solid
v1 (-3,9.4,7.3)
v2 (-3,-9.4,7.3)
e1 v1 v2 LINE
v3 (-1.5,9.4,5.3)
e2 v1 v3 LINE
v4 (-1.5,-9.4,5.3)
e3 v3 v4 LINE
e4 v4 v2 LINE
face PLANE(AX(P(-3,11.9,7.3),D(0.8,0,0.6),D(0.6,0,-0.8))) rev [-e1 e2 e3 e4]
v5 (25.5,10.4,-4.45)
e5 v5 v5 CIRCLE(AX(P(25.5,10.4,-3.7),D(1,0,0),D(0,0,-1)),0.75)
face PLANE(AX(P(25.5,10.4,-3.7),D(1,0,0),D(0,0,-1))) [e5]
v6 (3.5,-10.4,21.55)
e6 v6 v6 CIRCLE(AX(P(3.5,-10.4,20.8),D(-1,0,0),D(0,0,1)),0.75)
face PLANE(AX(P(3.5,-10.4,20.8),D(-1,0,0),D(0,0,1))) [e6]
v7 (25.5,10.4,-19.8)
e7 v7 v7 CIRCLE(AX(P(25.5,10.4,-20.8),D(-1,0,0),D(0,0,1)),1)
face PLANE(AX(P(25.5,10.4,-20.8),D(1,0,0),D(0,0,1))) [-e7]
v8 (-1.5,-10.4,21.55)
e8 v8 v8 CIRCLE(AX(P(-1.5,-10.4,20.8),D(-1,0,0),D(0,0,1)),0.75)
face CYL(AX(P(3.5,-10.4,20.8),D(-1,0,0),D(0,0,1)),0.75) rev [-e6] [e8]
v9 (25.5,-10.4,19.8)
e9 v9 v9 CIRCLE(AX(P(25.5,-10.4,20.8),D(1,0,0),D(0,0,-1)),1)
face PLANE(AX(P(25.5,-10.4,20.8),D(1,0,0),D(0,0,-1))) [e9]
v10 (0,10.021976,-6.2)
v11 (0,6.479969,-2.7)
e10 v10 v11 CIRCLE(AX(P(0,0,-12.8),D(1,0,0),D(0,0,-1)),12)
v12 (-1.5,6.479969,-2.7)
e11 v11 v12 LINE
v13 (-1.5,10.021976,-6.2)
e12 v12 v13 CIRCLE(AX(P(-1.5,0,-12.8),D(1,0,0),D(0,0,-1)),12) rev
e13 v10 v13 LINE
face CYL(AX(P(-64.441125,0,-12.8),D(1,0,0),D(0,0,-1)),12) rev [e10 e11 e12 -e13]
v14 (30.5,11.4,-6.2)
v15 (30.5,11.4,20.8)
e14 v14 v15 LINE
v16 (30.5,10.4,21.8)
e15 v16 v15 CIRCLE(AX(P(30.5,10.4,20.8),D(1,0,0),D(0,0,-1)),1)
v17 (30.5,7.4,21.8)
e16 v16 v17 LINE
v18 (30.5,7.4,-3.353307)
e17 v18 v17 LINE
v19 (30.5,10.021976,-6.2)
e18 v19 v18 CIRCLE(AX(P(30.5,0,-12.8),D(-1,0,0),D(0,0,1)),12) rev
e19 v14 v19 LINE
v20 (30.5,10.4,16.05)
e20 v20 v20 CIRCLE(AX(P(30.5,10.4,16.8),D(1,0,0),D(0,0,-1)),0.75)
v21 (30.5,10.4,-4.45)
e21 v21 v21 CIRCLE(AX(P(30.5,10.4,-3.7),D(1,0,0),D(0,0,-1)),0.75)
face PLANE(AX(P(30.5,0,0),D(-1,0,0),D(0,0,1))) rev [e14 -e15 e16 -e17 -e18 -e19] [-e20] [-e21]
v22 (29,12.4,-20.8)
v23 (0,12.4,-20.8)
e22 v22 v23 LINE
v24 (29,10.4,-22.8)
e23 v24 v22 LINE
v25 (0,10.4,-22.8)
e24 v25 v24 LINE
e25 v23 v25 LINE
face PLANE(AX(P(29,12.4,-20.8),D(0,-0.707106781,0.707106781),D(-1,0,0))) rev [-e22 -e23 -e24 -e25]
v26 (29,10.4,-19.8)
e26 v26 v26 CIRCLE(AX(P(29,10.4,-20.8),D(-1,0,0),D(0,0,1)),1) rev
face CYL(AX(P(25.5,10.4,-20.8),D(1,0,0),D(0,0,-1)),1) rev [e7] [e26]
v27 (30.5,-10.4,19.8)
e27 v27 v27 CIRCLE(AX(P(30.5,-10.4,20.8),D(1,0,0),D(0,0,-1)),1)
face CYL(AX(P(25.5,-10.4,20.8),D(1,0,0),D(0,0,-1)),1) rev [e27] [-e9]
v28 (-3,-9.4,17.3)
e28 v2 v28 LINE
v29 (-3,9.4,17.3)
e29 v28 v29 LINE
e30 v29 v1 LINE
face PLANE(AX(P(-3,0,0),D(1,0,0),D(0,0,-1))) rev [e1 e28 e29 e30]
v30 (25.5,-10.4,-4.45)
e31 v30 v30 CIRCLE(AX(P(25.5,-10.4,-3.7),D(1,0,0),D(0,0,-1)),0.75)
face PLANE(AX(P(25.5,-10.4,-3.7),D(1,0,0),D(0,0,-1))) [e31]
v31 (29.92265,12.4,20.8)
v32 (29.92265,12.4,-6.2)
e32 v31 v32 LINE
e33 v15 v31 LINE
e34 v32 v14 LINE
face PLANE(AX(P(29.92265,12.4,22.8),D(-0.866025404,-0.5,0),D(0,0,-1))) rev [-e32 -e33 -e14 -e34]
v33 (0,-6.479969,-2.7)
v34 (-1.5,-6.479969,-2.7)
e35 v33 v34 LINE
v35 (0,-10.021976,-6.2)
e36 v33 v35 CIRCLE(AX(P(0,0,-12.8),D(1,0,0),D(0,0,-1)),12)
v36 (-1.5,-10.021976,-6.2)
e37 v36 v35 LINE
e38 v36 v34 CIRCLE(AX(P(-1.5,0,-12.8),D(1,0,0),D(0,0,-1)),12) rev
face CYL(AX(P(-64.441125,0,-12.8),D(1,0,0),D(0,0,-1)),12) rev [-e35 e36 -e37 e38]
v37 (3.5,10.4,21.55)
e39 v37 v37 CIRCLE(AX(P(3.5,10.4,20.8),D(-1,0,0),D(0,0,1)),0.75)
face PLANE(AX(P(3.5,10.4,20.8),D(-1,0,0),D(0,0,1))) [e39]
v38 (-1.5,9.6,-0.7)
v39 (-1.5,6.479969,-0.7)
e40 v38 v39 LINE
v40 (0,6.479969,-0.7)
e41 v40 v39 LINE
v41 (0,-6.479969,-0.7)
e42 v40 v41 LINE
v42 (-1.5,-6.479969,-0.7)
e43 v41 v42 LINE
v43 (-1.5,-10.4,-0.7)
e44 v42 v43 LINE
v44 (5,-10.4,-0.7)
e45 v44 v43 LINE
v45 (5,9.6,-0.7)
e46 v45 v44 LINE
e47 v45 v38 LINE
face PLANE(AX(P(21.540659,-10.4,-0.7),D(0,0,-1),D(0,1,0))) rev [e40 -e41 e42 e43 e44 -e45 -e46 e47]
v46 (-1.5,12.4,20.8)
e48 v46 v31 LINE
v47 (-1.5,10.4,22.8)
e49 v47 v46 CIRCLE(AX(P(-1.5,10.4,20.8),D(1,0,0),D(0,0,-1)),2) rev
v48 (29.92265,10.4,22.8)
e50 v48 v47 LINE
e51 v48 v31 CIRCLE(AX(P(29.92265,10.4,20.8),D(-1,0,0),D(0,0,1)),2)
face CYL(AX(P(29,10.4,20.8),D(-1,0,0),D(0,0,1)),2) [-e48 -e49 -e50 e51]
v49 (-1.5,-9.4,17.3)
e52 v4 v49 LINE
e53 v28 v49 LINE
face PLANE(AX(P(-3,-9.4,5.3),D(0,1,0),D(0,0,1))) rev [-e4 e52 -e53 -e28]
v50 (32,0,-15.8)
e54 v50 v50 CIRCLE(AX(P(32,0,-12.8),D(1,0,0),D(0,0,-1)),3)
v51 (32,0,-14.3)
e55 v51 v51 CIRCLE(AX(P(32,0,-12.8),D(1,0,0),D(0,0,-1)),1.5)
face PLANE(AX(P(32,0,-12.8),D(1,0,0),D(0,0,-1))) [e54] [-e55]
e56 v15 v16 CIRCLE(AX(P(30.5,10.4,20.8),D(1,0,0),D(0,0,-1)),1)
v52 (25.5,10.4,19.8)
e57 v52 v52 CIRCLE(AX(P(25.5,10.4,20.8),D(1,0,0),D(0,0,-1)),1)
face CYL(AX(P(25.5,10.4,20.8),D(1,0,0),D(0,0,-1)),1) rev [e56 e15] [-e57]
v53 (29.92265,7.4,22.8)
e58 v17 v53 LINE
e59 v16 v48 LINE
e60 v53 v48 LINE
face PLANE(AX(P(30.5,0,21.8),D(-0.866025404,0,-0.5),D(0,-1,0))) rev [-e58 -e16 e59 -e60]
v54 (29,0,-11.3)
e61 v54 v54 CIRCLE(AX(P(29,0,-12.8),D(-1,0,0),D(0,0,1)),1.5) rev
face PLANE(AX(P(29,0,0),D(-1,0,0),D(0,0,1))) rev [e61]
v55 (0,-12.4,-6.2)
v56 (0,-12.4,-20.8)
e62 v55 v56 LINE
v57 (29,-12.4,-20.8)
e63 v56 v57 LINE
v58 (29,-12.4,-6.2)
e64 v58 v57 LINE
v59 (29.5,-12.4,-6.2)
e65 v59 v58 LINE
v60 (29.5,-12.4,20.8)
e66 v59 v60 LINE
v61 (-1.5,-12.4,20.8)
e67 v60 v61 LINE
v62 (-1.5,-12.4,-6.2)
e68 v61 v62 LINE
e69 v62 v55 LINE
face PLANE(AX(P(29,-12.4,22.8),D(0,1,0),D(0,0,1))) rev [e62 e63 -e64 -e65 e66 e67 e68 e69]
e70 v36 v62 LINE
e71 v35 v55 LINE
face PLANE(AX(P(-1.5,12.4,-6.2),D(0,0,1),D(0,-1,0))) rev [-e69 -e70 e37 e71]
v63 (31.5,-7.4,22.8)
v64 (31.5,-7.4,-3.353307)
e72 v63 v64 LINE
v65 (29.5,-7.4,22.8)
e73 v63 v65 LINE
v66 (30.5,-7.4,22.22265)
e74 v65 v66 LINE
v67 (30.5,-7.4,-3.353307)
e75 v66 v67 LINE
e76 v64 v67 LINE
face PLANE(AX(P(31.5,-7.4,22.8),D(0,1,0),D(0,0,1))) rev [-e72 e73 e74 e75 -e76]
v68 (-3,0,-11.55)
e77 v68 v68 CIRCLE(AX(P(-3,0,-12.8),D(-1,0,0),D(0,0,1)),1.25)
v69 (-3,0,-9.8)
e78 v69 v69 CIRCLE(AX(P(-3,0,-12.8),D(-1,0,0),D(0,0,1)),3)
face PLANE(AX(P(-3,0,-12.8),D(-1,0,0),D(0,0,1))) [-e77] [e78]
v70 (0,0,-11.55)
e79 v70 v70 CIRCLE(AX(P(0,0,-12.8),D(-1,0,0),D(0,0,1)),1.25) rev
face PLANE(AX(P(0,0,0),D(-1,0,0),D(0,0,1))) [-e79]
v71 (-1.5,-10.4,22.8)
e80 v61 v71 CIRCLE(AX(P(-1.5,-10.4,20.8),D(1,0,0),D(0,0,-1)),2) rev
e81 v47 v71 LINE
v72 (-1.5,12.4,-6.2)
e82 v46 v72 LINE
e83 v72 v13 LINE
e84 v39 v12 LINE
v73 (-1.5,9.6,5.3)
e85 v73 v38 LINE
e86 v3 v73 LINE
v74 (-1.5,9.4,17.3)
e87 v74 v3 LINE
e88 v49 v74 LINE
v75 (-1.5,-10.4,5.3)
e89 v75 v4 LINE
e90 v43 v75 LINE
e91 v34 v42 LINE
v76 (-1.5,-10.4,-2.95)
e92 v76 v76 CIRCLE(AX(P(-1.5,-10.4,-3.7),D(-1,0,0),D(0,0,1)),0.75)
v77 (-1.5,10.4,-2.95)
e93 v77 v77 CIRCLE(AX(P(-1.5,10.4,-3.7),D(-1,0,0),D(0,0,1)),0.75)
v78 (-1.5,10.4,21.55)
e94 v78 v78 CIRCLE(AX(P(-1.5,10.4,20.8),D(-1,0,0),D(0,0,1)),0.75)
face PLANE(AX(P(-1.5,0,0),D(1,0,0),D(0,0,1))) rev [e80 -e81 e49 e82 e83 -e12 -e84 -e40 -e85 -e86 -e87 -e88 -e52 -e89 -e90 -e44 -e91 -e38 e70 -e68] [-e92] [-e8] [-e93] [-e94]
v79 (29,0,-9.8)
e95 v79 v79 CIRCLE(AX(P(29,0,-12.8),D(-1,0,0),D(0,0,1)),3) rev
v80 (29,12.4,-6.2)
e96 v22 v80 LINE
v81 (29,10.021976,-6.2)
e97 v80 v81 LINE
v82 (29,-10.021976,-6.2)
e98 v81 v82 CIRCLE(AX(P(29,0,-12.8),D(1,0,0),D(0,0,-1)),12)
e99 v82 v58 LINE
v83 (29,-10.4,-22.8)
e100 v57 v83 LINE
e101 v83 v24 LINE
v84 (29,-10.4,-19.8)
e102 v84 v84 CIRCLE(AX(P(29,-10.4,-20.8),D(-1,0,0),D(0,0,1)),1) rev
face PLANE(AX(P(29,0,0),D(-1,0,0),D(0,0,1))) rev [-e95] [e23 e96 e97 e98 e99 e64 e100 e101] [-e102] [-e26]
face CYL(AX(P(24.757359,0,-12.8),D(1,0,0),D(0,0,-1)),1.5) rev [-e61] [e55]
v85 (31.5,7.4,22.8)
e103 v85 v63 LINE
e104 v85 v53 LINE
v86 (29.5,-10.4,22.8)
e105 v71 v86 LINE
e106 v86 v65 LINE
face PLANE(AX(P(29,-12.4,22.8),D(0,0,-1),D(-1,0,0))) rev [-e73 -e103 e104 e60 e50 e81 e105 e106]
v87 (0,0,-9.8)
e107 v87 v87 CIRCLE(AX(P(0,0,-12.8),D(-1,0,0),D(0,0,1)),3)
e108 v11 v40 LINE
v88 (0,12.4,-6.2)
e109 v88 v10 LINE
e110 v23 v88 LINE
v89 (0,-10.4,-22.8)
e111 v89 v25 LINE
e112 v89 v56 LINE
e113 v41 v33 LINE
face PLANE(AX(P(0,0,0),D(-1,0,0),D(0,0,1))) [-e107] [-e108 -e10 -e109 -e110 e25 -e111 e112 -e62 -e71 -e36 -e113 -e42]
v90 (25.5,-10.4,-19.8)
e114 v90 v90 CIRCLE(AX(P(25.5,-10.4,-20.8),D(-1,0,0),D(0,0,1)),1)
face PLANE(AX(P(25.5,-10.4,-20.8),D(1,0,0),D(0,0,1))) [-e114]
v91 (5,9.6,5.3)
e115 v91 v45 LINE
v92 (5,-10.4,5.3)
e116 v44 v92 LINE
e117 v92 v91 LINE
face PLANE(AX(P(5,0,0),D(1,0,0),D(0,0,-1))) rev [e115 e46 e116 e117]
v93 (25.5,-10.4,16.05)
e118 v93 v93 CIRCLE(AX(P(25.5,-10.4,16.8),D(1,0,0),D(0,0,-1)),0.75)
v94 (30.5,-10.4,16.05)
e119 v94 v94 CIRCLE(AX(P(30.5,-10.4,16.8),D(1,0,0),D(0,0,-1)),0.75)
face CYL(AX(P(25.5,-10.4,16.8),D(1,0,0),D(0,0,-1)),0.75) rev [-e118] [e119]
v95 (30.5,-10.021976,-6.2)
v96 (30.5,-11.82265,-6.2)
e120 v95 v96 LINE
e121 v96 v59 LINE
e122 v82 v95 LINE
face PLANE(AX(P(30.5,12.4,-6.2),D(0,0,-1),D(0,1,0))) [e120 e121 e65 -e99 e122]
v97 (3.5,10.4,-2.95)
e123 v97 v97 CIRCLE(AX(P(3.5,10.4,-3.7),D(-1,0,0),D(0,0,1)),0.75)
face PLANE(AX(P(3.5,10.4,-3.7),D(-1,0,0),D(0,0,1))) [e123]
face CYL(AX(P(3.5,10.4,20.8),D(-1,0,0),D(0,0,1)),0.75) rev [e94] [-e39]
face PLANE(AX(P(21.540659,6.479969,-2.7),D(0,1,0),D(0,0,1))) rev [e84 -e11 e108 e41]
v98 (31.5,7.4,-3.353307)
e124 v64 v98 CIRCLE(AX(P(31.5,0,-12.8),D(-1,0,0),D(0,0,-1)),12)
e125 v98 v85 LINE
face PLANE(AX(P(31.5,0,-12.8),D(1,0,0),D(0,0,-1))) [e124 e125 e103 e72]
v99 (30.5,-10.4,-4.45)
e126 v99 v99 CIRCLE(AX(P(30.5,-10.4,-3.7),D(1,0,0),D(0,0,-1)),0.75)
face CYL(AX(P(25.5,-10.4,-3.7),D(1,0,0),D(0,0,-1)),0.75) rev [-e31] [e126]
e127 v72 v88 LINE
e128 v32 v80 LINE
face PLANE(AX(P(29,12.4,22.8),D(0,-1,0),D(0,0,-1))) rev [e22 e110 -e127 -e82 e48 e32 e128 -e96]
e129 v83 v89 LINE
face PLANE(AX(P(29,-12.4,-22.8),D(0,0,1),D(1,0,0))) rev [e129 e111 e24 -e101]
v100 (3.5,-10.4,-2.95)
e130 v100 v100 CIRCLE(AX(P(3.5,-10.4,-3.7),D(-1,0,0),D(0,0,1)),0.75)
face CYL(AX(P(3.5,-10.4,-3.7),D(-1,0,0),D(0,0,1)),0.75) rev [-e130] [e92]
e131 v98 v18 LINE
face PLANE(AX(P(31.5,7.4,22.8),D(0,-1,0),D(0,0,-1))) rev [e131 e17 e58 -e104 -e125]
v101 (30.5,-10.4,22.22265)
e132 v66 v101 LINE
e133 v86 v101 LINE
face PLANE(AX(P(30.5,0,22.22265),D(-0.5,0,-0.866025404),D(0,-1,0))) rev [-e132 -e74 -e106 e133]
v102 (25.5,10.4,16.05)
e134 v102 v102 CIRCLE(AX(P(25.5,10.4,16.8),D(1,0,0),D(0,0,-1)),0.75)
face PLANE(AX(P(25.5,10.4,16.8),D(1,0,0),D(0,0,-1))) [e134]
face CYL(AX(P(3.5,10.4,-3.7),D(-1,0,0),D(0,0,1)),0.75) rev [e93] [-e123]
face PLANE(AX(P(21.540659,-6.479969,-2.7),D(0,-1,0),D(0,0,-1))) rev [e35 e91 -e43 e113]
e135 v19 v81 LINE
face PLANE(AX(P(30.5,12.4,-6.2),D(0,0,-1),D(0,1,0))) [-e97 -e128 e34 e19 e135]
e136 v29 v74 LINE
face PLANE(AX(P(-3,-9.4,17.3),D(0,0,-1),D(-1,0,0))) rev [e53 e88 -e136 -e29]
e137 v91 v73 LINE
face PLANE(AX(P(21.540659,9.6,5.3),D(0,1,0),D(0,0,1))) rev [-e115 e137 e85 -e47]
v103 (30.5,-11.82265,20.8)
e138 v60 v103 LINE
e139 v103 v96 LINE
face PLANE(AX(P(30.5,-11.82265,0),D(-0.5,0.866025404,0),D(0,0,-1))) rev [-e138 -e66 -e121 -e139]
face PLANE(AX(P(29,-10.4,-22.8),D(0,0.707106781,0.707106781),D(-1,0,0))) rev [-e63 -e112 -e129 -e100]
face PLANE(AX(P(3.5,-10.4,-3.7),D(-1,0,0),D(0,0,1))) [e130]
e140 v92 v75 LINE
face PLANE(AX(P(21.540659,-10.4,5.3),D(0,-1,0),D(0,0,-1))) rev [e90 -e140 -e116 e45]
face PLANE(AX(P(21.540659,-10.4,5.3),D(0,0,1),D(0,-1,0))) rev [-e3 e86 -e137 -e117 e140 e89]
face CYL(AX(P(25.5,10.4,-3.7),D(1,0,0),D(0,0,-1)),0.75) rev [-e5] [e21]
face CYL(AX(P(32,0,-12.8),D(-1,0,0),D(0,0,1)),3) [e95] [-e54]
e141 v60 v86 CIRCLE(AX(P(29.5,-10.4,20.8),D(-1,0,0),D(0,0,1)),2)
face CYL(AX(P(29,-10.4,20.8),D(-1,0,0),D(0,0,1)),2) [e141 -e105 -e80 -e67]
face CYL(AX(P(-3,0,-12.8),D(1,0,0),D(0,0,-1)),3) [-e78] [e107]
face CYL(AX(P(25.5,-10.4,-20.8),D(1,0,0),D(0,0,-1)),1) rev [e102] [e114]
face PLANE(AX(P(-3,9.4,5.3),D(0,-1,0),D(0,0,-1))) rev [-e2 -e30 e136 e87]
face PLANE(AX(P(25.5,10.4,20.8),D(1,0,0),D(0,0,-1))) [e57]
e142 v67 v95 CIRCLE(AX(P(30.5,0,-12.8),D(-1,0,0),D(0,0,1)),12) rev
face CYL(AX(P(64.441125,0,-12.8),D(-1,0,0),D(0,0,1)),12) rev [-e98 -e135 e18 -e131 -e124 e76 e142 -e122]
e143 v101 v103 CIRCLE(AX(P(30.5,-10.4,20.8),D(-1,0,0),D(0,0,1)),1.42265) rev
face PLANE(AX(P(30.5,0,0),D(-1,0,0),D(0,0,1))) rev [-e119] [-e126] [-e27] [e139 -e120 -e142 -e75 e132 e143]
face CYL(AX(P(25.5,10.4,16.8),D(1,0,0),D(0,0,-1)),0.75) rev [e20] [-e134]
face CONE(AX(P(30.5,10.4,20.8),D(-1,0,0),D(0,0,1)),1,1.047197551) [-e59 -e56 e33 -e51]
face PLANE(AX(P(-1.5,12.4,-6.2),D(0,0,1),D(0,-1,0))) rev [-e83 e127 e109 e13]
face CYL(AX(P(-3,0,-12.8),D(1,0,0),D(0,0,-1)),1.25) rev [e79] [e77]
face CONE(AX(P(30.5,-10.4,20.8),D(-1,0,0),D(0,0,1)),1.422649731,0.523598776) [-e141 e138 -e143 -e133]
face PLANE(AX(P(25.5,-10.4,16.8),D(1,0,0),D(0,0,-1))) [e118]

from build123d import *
from OCP.BRepFilletAPI import BRepFilletAPI_MakeChamfer

# Parameters (mm, degrees)
SKETCH3_W           = 45.6
SKETCH3_H           = 24.8
BOSS_EXTRUDE1_DEPTH = 29
SKETCH4_W           = 29
SKETCH4_H           = 24.8
BOSS_EXTRUDE2_DEPTH = 1.5
SKETCH6_R           = 12
CUT_EXTRUDE1_DEPTH  = 1.5
BOSS_EXTRUDE3_DEPTH = 1
SKETCH10_W          = 12
SKETCH10_H          = 18.8
BOSS_EXTRUDE5_DEPTH = 1.5
CUT_EXTRUDE2_DEPTH  = 18.8
CUT_EXTRUDE3_DEPTH  = 1.5
SKETCH13_W          = 6
SKETCH13_H          = 20
CUT_EXTRUDE4_DEPTH  = 5
SKETCH14_R          = 0.75
CUT_EXTRUDE5_DEPTH  = 5
SKETCH8_R           = 1
CUT_EXTRUDE6_DEPTH  = 5
CUT_EXTRUDE7_START  = -5
SKETCH15_R          = 0.75
CUT_EXTRUDE7_DEPTH  = 5
SKETCH17_R          = 0.75
CUT_EXTRUDE8_DEPTH  = 5
SKETCH18_R          = 3
BOSS_EXTRUDE6_DEPTH = 3
SKETCH19_R          = 1.5
CUT_EXTRUDE9_DEPTH  = 3
FILLET1_R           = 2
CHAMFER1_SIZE       = 2
CHAMFER2_SIZE       = 1
CHAMFER2_SIZE_2     = 0.577350269
BOSS_EXTRUDE7_START = 3
SKETCH9_R           = 3
SKETCH9_R_2         = 1.25
BOSS_EXTRUDE7_DEPTH = 3


with BuildPart() as part:
    # Sketch3 → Boss-Extrude1 (new body)
    with BuildSketch(Plane(origin=(0, 0, 0), x_dir=(0, 0, -1), z_dir=(1, 0, 0))):
        Rectangle(SKETCH3_W, SKETCH3_H)
    extrude(amount=BOSS_EXTRUDE1_DEPTH)

    # Sketch4 → Boss-Extrude2 (add)
    with BuildSketch(Plane(origin=(29, 0, 0), x_dir=(0, 0, -1), z_dir=(1, 0, 0))):
        with Locations((-8.3, 0)):
            Rectangle(SKETCH4_W, SKETCH4_H)
    boss_extrude2 = extrude(amount=BOSS_EXTRUDE2_DEPTH)

    # Sketch6 → Cut-Extrude1 (cut)
    with BuildSketch(Plane(origin=(29, 0, 0), x_dir=(0, 0, -1), z_dir=(1, 0, 0))):
        with Locations((12.8, 0)):
            Circle(SKETCH6_R)
    cut_extrude1 = extrude(amount=CUT_EXTRUDE1_DEPTH, mode=Mode.SUBTRACT)

    # Sketch7 → Boss-Extrude3 (add)
    with BuildSketch(Plane(origin=(30.5, 0, 0), x_dir=(0, 0, -1), z_dir=(1, 0, 0))):
        with BuildLine():
            Line((-22.8, 7.4), (3.353307457, 7.4))
            ThreePointArc((3.353307457, 7.4), (0.8, 0), (3.353307457, -7.4))
            Line((3.353307457, -7.4), (-22.8, -7.4))
            Line((-22.8, -7.4), (-22.8, 7.4))
        make_face()
    extrude(amount=BOSS_EXTRUDE3_DEPTH)

    # Mirror2: Boss-Extrude2, Cut-Extrude1 across plane
    add(boss_extrude2.mirror(Plane.ZY.offset(-14.5)))
    add(cut_extrude1.mirror(Plane.ZY.offset(-14.5)), mode=Mode.SUBTRACT)

    # Sketch10 → Boss-Extrude5 (add)
    with BuildSketch(Plane.ZY.offset(1.5)):
        with Locations((11.3, 0)):
            Rectangle(SKETCH10_W, SKETCH10_H)
    extrude(amount=BOSS_EXTRUDE5_DEPTH)

    # Sketch11 → Cut-Extrude2 (cut)
    with BuildSketch(Plane.XZ.offset(9.4)):
        Polygon((-3, 7.3), (-1.5, 5.3), (-3, 5.3), align=None)
    extrude(amount=-CUT_EXTRUDE2_DEPTH, mode=Mode.SUBTRACT)

    # Sketch12 → Cut-Extrude3 (cut)
    with BuildSketch(Plane.ZY.offset(1.5)):
        with BuildLine():
            Line((5.3, -10.4), (-0.7, -10.4))
            Line((-0.7, -10.4), (-0.7, -6.479969136))
            Line((-0.7, -6.479969136), (-2.7, -6.479969136))
            ThreePointArc((-2.7, -6.479969136), (-0.8, 0), (-2.7, 6.479969136))
            Line((-2.7, 6.479969136), (-0.7, 6.479969136))
            Line((-0.7, 6.479969136), (-0.7, 9.6))
            Line((-0.7, 9.6), (5.3, 9.6))
            Line((5.3, 9.6), (5.3, -10.4))
        make_face()
    extrude(amount=-CUT_EXTRUDE3_DEPTH, mode=Mode.SUBTRACT)

    # Sketch13 → Cut-Extrude4 (cut)
    with BuildSketch(Plane.ZY):
        with Locations((2.3, -0.4)):
            Rectangle(SKETCH13_W, SKETCH13_H)
    extrude(amount=-CUT_EXTRUDE4_DEPTH, mode=Mode.SUBTRACT)

    # Sketch14 → Cut-Extrude5 (cut)
    with BuildSketch(Plane.ZY.offset(1.5)):
        with Locations((20.8, 10.4)):
            Circle(SKETCH14_R)
        with Locations((20.8, -10.4)):
            Circle(SKETCH14_R)
        with Locations((-3.7, 10.4)):
            Circle(SKETCH14_R)
        with Locations((-3.7, -10.4)):
            Circle(SKETCH14_R)
    extrude(amount=-CUT_EXTRUDE5_DEPTH, mode=Mode.SUBTRACT)

    # Sketch8 → Cut-Extrude6 (cut)
    with BuildSketch(Plane(origin=(30.5, 0, 0), x_dir=(0, 0, -1), z_dir=(1, 0, 0))):
        with Locations((-20.8, 10.4)):
            Circle(SKETCH8_R)
        with Locations((-20.8, -10.4)):
            Circle(SKETCH8_R)
    cut_extrude6 = extrude(amount=-CUT_EXTRUDE6_DEPTH, mode=Mode.SUBTRACT)

    # Sketch15 → Cut-Extrude7 (cut)
    with BuildSketch(Plane(origin=(30.5, 0, 0), x_dir=(0, 0, -1), z_dir=(1, 0, 0)).offset(CUT_EXTRUDE7_START)):
        with Locations(Location((3.7, -10.4, 0), (0, 0, 180))):
            Circle(SKETCH15_R)
        with Locations(Location((3.7, 10.4, 0), (0, 0, 180))):
            Circle(SKETCH15_R)
    extrude(amount=CUT_EXTRUDE7_DEPTH, mode=Mode.SUBTRACT)

    # Sketch17 → Cut-Extrude8 (cut)
    with BuildSketch(Plane(origin=(30.5, 0, 0), x_dir=(0, 0, -1), z_dir=(1, 0, 0))):
        with Locations((-16.8, 10.4)):
            Circle(SKETCH17_R)
        with Locations((-16.8, -10.4)):
            Circle(SKETCH17_R)
    extrude(amount=-CUT_EXTRUDE8_DEPTH, mode=Mode.SUBTRACT)

    # Mirror3: Cut-Extrude6 across plane
    add(cut_extrude6.mirror(Plane.XY), mode=Mode.SUBTRACT)

    # Sketch18 → Boss-Extrude6 (add)
    with BuildSketch(Plane(origin=(29, 0, 0), x_dir=(0, 0, -1), z_dir=(1, 0, 0))):
        with Locations(Location((12.8, 0, 0), (0, 0, 180))):
            Circle(SKETCH18_R)
    extrude(amount=BOSS_EXTRUDE6_DEPTH)

    # Sketch19 → Cut-Extrude9 (cut)
    with BuildSketch(Plane(origin=(32, 0, 0), x_dir=(0, 0, -1), z_dir=(1, 0, 0))):
        with Locations((12.8, 0)):
            Circle(SKETCH19_R)
    extrude(amount=-CUT_EXTRUDE9_DEPTH, mode=Mode.SUBTRACT)

    # Fillet1
    fillet1_edges = [part.edges().sort_by_distance(p)[0] for p in [
        (14.5, -12.4, 22.8),
        (14.5, 12.4, 22.8),
    ]]
    fillet(fillet1_edges, radius=FILLET1_R)

    # Chamfer1
    chamfer1_edges = [part.edges().sort_by_distance(p)[0] for p in [
        (14.5, -12.4, -22.8),
        (14.5, 12.4, -22.8),
    ]]
    chamfer(chamfer1_edges, length=CHAMFER1_SIZE)

    # Chamfer2
    chamfer2_edges_1 = [part.edges().sort_by_distance(p)[0] for p in [
        (30.5, -12.4, 7.3),
    ]]
    chamfer2_side_1 = [part.faces().sort_by_distance(p)[0] for p in [
        (30.488452995, -12.4, 7.3),
    ]]
    chamfer2_edges_2 = [part.edges().sort_by_distance(p)[0] for p in [
        (30.5, 8.9, 22.8),
    ]]
    chamfer2_side_2 = [part.faces().sort_by_distance(p)[0] for p in [
        (30.488452995, 8.9, 22.8),
    ]]
    chamfer2_edges_3 = [part.edges().sort_by_distance(p)[0] for p in [
        (30.5, 12.4, 7.3),
    ]]
    chamfer2_side_3 = [part.faces().sort_by_distance(p)[0] for p in [
        (30.488452995, 12.4, 7.3),
    ]]
    chamfer2_edges_4 = [part.edges().sort_by_distance(p)[0] for p in [
        (30.5, 11.814213562, 22.214213562),
    ]]
    chamfer2_side_4 = [part.faces().sort_by_distance(p)[0] for p in [
        (30.488452995, 11.814213562, 22.214213562),
    ]]
    chamfer2_edges_5 = [part.edges().sort_by_distance(p)[0] for p in [
        (30.5, -11.814213562, 22.214213562),
    ]]
    chamfer2_side_5 = [part.faces().sort_by_distance(p)[0] for p in [
        (30.5, -11.806048597, 22.206048597),
    ]]
    chamfer2_edges_6 = [part.edges().sort_by_distance(p)[0] for p in [
        (30.5, -8.9, 22.8),
    ]]
    chamfer2_side_6 = [part.faces().sort_by_distance(p)[0] for p in [
        (30.5, -8.9, 22.788452995),
    ]]
    chamfer2 = BRepFilletAPI_MakeChamfer(part.part.solid().wrapped)
    for e in chamfer2_edges_1:
        chamfer2.Add(CHAMFER2_SIZE - 0.0001, CHAMFER2_SIZE_2 - 0.0001, e.wrapped, chamfer2_side_1[0].wrapped)
    for e in chamfer2_edges_2:
        chamfer2.Add(CHAMFER2_SIZE_2 - 0.0001, CHAMFER2_SIZE - 0.0001, e.wrapped, chamfer2_side_2[0].wrapped)
    for e in chamfer2_edges_3:
        chamfer2.Add(CHAMFER2_SIZE_2 - 0.0001, CHAMFER2_SIZE - 0.0001, e.wrapped, chamfer2_side_3[0].wrapped)
    for e in chamfer2_edges_4:
        chamfer2.Add(CHAMFER2_SIZE_2 - 0.0001, CHAMFER2_SIZE - 0.0001, e.wrapped, chamfer2_side_4[0].wrapped)
    for e in chamfer2_edges_5:
        chamfer2.Add(CHAMFER2_SIZE_2 - 0.0001, CHAMFER2_SIZE - 0.0001, e.wrapped, chamfer2_side_5[0].wrapped)
    for e in chamfer2_edges_6:
        chamfer2.Add(CHAMFER2_SIZE_2 - 0.0001, CHAMFER2_SIZE - 0.0001, e.wrapped, chamfer2_side_6[0].wrapped)
    add(Compound.cast(chamfer2.Shape()), mode=Mode.REPLACE)  # a hair under: the kernel refuses the full size

    # Sketch9 → Boss-Extrude7 (add)
    with BuildSketch(Plane.ZY.offset(BOSS_EXTRUDE7_START)):
        with Locations((-12.8, 0)):
            Circle(SKETCH9_R)
        with Locations((-12.8, 0)):
            Circle(SKETCH9_R_2, mode=Mode.SUBTRACT)
    extrude(amount=-BOSS_EXTRUDE7_DEPTH)


solid = part.part
